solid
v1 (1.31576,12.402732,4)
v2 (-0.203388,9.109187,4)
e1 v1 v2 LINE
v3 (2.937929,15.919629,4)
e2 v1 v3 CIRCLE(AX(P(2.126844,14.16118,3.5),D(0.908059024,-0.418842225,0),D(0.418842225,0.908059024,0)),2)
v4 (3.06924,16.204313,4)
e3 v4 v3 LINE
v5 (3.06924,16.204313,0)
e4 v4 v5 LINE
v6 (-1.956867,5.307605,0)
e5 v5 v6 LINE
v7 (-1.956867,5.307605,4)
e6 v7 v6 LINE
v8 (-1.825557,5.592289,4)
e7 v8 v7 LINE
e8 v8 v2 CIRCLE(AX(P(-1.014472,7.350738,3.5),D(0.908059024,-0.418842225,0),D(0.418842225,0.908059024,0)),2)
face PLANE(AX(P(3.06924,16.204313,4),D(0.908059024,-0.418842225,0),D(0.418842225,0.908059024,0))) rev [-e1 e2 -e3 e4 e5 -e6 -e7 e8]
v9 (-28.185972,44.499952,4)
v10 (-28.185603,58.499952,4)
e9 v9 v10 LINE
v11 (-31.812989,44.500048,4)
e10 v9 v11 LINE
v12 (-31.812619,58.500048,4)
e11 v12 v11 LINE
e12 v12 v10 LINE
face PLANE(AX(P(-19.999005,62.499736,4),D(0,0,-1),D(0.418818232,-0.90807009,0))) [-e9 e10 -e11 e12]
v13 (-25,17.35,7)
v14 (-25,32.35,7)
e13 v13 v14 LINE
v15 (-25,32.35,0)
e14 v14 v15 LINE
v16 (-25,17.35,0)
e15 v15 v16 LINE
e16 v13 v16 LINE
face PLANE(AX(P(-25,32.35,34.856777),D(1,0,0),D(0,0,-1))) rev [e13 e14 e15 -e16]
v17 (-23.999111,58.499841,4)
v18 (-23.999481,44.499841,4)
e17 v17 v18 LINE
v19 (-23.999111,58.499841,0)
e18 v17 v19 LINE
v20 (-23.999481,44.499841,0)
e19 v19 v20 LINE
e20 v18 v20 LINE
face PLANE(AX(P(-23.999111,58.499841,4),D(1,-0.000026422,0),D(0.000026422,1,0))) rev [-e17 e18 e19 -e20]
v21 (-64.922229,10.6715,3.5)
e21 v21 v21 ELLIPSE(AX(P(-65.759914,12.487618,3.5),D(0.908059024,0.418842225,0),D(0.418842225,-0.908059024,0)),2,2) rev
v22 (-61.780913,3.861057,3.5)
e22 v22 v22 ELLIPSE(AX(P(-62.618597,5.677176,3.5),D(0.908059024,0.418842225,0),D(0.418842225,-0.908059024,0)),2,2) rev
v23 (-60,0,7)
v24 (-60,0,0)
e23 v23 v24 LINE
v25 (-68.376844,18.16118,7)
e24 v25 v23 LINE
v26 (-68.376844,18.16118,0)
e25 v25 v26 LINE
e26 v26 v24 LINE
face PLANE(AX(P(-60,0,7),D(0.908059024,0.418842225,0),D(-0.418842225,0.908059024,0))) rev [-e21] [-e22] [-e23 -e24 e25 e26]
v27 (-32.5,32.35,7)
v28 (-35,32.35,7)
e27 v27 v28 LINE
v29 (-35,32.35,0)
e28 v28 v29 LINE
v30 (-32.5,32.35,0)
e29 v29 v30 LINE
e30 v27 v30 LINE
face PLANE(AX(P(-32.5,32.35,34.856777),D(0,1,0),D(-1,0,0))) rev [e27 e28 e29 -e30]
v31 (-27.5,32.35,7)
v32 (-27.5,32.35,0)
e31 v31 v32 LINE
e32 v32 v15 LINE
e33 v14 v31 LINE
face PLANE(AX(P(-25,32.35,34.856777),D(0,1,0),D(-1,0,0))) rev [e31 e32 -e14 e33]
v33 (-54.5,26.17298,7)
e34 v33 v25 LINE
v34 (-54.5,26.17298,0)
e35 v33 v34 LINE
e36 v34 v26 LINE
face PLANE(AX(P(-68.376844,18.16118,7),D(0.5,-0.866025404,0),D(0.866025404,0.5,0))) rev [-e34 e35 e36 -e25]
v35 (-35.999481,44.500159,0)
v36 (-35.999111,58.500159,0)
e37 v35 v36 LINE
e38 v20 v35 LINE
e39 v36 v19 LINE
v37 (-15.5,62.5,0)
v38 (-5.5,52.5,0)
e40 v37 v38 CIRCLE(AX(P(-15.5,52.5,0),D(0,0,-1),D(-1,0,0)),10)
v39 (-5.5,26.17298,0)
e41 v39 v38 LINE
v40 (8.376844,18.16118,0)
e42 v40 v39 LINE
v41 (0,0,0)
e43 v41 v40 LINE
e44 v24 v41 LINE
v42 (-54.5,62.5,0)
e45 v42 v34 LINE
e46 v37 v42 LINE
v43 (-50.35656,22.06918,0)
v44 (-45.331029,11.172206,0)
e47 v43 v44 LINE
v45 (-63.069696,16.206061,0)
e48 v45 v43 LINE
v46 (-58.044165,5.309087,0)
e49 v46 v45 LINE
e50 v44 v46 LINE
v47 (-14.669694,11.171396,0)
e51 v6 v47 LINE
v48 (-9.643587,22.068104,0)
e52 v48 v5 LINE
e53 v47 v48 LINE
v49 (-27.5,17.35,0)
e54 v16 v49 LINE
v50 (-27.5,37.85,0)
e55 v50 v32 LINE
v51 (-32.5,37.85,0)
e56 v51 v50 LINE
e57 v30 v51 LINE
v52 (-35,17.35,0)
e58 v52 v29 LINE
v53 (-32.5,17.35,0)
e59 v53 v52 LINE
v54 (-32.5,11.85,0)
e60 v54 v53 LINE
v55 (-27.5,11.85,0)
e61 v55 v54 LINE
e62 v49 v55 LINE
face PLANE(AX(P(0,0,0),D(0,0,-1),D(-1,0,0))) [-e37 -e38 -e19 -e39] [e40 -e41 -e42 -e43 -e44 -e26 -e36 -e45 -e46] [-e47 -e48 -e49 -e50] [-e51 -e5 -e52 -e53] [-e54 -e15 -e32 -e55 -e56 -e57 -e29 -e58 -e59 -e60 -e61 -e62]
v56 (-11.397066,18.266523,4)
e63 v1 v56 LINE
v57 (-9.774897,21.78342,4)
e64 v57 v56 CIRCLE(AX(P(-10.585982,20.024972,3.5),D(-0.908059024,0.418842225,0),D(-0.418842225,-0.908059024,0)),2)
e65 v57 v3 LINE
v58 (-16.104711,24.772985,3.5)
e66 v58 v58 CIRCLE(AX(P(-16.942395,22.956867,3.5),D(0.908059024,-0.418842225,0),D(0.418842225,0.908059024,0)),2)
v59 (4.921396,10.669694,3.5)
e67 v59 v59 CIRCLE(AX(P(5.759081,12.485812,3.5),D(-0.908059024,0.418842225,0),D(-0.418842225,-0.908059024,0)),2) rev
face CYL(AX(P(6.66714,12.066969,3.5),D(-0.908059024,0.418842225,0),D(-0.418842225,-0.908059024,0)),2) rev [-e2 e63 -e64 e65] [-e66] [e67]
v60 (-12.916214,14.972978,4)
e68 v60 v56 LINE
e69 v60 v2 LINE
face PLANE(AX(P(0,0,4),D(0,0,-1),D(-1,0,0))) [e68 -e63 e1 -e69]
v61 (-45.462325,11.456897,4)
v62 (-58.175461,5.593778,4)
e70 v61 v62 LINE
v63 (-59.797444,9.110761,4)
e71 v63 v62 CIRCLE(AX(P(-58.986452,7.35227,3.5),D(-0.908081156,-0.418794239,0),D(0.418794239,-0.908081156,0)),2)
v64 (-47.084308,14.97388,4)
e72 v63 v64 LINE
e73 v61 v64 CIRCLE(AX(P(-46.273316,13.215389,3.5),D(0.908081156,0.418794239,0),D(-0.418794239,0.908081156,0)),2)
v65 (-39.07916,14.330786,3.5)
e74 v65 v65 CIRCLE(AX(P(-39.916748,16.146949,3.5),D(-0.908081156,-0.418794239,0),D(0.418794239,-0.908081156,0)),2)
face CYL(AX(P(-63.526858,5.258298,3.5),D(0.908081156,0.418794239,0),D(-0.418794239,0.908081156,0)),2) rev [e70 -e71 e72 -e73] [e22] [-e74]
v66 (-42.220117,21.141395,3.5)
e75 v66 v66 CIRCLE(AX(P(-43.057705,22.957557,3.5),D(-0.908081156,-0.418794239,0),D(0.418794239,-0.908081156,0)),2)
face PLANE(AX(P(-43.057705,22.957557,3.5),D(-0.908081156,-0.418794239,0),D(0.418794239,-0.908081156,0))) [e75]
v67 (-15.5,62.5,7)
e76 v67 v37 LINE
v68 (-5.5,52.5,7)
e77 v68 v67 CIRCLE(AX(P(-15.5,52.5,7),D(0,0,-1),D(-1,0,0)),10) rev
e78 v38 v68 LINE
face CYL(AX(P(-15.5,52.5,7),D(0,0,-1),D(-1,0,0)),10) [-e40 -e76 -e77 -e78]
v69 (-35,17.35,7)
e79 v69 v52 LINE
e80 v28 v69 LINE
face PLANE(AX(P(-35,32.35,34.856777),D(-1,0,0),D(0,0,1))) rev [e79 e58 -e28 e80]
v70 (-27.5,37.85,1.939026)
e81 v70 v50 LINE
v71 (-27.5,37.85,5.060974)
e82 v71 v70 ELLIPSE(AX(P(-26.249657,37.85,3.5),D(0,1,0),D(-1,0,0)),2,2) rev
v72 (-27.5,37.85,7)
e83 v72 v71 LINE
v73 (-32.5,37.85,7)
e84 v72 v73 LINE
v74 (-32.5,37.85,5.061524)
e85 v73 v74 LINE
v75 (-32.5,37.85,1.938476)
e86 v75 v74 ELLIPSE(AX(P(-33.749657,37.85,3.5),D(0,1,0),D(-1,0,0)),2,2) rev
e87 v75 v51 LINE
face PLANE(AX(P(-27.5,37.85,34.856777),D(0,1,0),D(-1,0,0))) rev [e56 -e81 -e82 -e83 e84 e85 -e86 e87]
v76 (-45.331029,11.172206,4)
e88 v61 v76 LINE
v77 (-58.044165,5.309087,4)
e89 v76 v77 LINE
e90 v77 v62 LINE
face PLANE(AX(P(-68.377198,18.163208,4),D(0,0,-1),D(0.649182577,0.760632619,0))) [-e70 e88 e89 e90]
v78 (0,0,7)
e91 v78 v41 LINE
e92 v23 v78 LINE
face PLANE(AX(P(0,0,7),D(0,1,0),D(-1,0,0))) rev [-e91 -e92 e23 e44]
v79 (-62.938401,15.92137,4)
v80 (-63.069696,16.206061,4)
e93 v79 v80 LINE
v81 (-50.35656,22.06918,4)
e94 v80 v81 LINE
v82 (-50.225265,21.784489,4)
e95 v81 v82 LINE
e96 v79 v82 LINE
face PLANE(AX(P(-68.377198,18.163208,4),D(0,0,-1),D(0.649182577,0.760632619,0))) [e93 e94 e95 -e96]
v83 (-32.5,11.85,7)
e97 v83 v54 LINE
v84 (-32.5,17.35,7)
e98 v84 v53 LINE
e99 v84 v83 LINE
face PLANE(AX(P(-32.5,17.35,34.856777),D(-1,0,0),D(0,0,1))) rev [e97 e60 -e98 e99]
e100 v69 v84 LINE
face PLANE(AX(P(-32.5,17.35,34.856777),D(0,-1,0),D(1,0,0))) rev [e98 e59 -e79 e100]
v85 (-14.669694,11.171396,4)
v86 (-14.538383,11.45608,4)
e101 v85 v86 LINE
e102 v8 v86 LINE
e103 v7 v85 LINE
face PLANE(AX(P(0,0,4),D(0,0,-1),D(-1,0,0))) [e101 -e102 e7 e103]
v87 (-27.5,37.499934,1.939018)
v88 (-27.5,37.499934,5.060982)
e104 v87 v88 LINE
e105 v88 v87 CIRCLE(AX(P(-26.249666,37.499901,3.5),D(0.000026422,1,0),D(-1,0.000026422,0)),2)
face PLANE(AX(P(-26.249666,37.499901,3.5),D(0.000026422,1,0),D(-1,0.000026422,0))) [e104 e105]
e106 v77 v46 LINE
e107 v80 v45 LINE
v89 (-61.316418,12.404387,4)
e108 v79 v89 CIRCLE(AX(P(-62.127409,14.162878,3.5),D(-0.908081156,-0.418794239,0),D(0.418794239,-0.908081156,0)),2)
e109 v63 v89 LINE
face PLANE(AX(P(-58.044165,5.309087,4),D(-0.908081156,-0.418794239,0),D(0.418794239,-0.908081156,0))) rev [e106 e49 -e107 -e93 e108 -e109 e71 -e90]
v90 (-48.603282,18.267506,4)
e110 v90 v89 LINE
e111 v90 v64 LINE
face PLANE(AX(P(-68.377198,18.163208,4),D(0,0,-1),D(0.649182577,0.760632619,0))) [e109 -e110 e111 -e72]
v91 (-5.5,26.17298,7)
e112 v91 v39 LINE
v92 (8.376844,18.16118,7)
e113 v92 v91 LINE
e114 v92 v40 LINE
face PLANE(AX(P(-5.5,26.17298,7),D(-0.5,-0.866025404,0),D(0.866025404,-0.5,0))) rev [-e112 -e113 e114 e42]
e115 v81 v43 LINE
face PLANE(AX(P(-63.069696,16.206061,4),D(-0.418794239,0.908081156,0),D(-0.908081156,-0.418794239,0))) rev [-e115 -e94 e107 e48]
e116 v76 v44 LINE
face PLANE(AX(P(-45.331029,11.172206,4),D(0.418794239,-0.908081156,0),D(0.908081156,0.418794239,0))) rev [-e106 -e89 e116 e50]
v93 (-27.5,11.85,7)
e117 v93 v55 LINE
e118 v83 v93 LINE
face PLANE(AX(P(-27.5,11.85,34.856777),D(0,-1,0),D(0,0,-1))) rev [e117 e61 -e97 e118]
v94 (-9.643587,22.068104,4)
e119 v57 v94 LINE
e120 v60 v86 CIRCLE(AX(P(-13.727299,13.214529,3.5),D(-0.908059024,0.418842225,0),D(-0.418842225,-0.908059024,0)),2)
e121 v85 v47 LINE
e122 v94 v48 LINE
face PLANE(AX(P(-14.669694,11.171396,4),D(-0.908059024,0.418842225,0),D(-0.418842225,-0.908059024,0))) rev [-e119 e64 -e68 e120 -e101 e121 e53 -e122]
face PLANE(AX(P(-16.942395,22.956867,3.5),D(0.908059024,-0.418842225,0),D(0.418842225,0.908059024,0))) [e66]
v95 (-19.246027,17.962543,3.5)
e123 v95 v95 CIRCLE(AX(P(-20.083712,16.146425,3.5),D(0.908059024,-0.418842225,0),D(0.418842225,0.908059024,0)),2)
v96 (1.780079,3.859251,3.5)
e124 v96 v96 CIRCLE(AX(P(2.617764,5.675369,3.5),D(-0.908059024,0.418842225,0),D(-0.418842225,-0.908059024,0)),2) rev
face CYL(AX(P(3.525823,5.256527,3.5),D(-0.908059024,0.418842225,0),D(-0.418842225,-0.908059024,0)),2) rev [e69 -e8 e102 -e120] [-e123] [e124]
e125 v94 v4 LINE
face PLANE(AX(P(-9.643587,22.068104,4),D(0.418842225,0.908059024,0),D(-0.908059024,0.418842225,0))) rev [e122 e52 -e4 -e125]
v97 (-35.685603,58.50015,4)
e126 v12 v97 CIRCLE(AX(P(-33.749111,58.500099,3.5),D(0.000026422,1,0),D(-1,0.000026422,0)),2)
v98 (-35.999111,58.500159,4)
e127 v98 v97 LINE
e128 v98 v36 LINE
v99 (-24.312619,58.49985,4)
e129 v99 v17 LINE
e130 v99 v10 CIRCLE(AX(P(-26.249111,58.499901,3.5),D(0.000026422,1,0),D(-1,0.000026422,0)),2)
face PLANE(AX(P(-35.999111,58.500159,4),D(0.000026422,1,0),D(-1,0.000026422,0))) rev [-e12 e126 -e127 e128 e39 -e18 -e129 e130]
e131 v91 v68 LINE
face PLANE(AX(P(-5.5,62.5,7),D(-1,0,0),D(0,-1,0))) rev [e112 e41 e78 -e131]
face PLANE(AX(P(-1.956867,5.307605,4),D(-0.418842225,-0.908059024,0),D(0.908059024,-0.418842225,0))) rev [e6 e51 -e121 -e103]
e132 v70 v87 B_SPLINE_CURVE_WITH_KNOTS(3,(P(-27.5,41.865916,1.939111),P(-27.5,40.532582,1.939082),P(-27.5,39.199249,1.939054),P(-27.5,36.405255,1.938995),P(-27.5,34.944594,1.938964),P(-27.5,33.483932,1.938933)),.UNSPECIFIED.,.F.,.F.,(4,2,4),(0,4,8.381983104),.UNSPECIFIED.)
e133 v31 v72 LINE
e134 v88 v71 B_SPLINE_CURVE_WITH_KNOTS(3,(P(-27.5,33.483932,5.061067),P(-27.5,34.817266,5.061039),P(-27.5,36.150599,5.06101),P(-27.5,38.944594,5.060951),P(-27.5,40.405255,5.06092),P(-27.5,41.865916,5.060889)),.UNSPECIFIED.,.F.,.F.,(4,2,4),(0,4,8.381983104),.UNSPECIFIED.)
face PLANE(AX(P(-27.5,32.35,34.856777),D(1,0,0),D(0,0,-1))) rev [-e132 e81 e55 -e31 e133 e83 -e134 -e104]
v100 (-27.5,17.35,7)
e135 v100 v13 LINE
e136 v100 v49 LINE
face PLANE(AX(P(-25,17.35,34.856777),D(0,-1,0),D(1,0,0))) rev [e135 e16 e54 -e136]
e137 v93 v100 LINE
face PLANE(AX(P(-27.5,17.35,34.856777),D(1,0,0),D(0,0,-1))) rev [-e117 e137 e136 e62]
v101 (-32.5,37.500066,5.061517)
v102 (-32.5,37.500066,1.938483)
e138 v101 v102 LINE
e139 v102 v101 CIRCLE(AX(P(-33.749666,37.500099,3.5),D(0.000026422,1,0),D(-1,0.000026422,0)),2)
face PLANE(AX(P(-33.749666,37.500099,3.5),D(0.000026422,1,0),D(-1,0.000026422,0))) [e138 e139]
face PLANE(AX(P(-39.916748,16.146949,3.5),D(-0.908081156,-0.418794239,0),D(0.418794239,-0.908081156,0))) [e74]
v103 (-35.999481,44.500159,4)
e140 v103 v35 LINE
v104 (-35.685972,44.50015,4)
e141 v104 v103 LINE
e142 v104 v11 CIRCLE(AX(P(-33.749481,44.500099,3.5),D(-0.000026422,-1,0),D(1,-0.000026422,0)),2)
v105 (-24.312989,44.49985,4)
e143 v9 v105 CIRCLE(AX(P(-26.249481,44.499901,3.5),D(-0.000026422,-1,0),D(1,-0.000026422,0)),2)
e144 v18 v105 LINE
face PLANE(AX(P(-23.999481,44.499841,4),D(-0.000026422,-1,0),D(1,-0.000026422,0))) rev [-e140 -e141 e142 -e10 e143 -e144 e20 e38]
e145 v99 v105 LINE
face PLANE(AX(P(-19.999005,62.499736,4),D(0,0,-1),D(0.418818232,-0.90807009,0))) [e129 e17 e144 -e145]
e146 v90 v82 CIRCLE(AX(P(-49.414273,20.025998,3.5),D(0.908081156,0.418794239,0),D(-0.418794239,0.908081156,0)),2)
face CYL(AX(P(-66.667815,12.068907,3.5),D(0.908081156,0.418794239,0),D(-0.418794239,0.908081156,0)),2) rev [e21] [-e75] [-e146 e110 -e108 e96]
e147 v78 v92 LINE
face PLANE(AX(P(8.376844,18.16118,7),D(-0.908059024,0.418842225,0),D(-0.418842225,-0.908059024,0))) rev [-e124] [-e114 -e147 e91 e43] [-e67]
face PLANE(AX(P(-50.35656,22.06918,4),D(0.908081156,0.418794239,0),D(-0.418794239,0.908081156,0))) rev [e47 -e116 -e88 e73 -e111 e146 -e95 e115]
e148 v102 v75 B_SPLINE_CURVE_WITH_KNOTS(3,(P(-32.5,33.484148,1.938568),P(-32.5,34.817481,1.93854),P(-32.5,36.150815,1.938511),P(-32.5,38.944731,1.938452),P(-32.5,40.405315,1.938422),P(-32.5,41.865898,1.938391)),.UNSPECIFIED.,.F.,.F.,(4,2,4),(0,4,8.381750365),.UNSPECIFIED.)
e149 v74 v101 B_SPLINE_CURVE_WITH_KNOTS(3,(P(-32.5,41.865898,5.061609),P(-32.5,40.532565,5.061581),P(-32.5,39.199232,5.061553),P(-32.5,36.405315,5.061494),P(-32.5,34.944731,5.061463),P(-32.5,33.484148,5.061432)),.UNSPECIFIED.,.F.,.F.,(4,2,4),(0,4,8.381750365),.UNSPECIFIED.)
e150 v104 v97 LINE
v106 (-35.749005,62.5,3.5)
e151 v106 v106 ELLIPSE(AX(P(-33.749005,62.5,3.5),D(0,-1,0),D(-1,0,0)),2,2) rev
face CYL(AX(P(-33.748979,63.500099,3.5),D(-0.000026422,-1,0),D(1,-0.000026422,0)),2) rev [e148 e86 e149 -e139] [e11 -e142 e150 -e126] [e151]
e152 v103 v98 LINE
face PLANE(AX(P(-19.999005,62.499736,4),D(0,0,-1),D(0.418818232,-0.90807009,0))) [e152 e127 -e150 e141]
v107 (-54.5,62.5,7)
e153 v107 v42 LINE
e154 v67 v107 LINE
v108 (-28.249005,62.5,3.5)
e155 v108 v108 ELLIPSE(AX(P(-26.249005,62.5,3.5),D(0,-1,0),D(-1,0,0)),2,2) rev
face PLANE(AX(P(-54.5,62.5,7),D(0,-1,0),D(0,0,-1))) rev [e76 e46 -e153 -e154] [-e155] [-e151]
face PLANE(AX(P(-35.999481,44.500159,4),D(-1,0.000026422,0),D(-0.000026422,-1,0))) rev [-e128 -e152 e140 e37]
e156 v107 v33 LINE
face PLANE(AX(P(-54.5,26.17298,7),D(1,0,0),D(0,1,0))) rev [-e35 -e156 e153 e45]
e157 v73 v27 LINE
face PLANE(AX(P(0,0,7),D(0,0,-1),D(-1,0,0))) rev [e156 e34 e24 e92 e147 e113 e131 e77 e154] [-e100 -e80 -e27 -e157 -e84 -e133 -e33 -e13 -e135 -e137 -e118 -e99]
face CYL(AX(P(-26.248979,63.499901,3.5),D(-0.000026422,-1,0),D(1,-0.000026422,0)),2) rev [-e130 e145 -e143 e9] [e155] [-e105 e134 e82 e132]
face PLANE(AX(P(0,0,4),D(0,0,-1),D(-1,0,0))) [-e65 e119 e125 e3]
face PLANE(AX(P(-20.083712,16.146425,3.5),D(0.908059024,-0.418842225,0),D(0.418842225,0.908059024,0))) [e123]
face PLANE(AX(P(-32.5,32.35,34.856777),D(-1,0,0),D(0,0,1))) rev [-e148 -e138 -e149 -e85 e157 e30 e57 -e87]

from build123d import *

# Parameters (mm, degrees)
BOSS_EXTRUDE1_DEPTH     = 7
CUT_EXTRUDE1_START      = -25
SKETCH2_R               = 2
CUT_EXTRUDE1_DEPTH      = 26
CUT_EXTRUDE3_DEPTH      = 7
CUT_EXTRUDE2_DEPTH      = 4
CIRPATTERN2_START       = 44.499207337
CIRPATTERN2_DEPTH       = 14
CIRPATTERN2_START_2     = 37.499207337
CIRPATTERN2_2_OUTLINE_R = 2
CIRPATTERN2_2_DEPTH     = 25.000152039
CIRPATTERN2_START_3     = -50.485397831
CIRPATTERN2_3_DEPTH     = 14
CIRPATTERN2_START_4     = -54.485701834
CIRPATTERN2_4_OUTLINE_R = 2
CIRPATTERN2_4_DEPTH     = 25.000304003
FILLET1_R               = 10


# Read off the part's stored shape, not the designer's step: CirPattern2
with BuildPart() as part:
    # Sketch1 → Boss-Extrude1 (new body)
    with BuildSketch(Plane.XY):
        Polygon((-54.5, 62.5), (-5.5, 62.5), (-5.5, 26.172980381), (8.376844495, 18.161180477), (0, 0), (-60, 0), (-68.376844495, 18.161180477), (-54.5, 26.172980381), align=None)
    extrude(amount=BOSS_EXTRUDE1_DEPTH)

    # Sketch2 → Cut-Extrude1 (cut)
    with BuildSketch(Plane(origin=(0, 0, 0), x_dir=(0, 0, -1), z_dir=(0.9080590238365492, -0.41884222474460864, 0)).offset(CUT_EXTRUDE1_START)):
        with Locations(Location((-3.5, 13.75, 0), (0, 0, 270))):
            Circle(SKETCH2_R)
        with Locations(Location((-3.5, 6.25, 0), (0, 0, 270))):
            Circle(SKETCH2_R)
    extrude(amount=CUT_EXTRUDE1_DEPTH, mode=Mode.SUBTRACT)

    # Sketch7 → Cut-Extrude3 (cut)
    with BuildSketch(Plane(origin=(0, 0, 0), x_dir=(-1, 0, 0), z_dir=(0, 0, -1))):
        Polygon((32.5, 17.35), (35, 17.35), (35, 32.35), (32.5, 32.35), (32.5, 37.85), (27.5, 37.85), (27.5, 32.35), (25, 32.35), (25, 17.35), (27.5, 17.35), (27.5, 11.85), (32.5, 11.85), align=None)
    extrude(amount=-CUT_EXTRUDE3_DEPTH, mode=Mode.SUBTRACT)

    # Sketch5 → Cut-Extrude2 (cut)
    with BuildSketch(Plane(origin=(0, 0, 0), x_dir=(-1, 0, 0), z_dir=(0, 0, -1))):
        Polygon((-3.069239501, 16.20431328), (1.956867196, 5.307604994), (14.66969353, 11.171396141), (9.643586833, 22.068104427), align=None)
    extrude(amount=-CUT_EXTRUDE2_DEPTH, mode=Mode.SUBTRACT)

    # CirPattern2 outline → CirPattern2 (cut)
    with BuildSketch(Plane(origin=(0, 0, 0), x_dir=(0.9999999996509443, -2.6421799769471613e-05, 0), z_dir=(2.642179976947161e-05, 0.9999999996509443, 0)).offset(CIRPATTERN2_START)):
        with BuildLine():
            ThreePointArc((-35.687148244, -4), (-33.750656571, -5.5), (-31.814164898, -4))
            Line((-31.814164898, -4), (-28.187148244, -4))
            ThreePointArc((-28.187148244, -4), (-26.250656571, -5.5), (-24.314164898, -4))
            Line((-24.314164898, -4), (-24.000656571, -4))
            Line((-24.000656571, -4), (-24.000656571, 0))
            Line((-24.000656571, 0), (-36.000656571, 0))
            Line((-36.000656571, 0), (-36.000656571, -4))
            Line((-36.000656571, -4), (-35.687148244, -4))
        make_face()
    extrude(amount=CIRPATTERN2_DEPTH, mode=Mode.SUBTRACT)

    # CirPattern2 2 outline → CirPattern2 2 (cut)
    with BuildSketch(Plane(origin=(0, 0, 0), x_dir=(0.9999999996509443, -2.6421799769471613e-05, 0), z_dir=(2.642179976947161e-05, 0.9999999996509443, 0)).offset(CIRPATTERN2_START_2)):
        with Locations((-33.750656571, -3.5)):
            Circle(CIRPATTERN2_2_OUTLINE_R)
        with Locations((-26.250656571, -3.5)):
            Circle(CIRPATTERN2_2_OUTLINE_R)
    extrude(amount=CIRPATTERN2_2_DEPTH, mode=Mode.SUBTRACT)

    # CirPattern2 3 outline → CirPattern2 3 (cut)
    with BuildSketch(Plane(origin=(0, 0, 0), x_dir=(-0.418794239052402, 0.908081155699489, 0), z_dir=(0.908081155699489, 0.418794239052402, 0)).offset(CIRPATTERN2_START_3)):
        with BuildLine():
            ThreePointArc((33.316135564, 4), (31.379643891, 5.5), (29.443152218, 4))
            Line((29.443152218, 4), (29.129643891, 4))
            Line((29.129643891, 4), (29.129643891, 0))
            Line((29.129643891, 0), (41.129643891, 0))
            Line((41.129643891, 0), (41.129643891, 4))
            Line((41.129643891, 4), (40.816135564, 4))
            ThreePointArc((40.816135564, 4), (38.879643891, 5.5), (36.943152218, 4))
            Line((36.943152218, 4), (33.316135564, 4))
        make_face()
    extrude(amount=CIRPATTERN2_3_DEPTH, mode=Mode.SUBTRACT)

    # CirPattern2 4 outline → CirPattern2 4 (cut)
    with BuildSketch(Plane(origin=(0, 0, 0), x_dir=(-0.418794239052402, 0.908081155699489, 0), z_dir=(0.908081155699489, 0.418794239052402, 0)).offset(CIRPATTERN2_START_4)):
        with Locations((31.379643891, 3.5)):
            Circle(CIRPATTERN2_4_OUTLINE_R)
        with Locations((38.879643891, 3.5)):
            Circle(CIRPATTERN2_4_OUTLINE_R)
    extrude(amount=CIRPATTERN2_4_DEPTH, mode=Mode.SUBTRACT)

    # Fillet1
    fillet1_edges = [part.edges().sort_by_distance(p)[0] for p in [
        (-5.5, 62.5, 3.5),
    ]]
    fillet(fillet1_edges, radius=FILLET1_R)


solid = part.part
